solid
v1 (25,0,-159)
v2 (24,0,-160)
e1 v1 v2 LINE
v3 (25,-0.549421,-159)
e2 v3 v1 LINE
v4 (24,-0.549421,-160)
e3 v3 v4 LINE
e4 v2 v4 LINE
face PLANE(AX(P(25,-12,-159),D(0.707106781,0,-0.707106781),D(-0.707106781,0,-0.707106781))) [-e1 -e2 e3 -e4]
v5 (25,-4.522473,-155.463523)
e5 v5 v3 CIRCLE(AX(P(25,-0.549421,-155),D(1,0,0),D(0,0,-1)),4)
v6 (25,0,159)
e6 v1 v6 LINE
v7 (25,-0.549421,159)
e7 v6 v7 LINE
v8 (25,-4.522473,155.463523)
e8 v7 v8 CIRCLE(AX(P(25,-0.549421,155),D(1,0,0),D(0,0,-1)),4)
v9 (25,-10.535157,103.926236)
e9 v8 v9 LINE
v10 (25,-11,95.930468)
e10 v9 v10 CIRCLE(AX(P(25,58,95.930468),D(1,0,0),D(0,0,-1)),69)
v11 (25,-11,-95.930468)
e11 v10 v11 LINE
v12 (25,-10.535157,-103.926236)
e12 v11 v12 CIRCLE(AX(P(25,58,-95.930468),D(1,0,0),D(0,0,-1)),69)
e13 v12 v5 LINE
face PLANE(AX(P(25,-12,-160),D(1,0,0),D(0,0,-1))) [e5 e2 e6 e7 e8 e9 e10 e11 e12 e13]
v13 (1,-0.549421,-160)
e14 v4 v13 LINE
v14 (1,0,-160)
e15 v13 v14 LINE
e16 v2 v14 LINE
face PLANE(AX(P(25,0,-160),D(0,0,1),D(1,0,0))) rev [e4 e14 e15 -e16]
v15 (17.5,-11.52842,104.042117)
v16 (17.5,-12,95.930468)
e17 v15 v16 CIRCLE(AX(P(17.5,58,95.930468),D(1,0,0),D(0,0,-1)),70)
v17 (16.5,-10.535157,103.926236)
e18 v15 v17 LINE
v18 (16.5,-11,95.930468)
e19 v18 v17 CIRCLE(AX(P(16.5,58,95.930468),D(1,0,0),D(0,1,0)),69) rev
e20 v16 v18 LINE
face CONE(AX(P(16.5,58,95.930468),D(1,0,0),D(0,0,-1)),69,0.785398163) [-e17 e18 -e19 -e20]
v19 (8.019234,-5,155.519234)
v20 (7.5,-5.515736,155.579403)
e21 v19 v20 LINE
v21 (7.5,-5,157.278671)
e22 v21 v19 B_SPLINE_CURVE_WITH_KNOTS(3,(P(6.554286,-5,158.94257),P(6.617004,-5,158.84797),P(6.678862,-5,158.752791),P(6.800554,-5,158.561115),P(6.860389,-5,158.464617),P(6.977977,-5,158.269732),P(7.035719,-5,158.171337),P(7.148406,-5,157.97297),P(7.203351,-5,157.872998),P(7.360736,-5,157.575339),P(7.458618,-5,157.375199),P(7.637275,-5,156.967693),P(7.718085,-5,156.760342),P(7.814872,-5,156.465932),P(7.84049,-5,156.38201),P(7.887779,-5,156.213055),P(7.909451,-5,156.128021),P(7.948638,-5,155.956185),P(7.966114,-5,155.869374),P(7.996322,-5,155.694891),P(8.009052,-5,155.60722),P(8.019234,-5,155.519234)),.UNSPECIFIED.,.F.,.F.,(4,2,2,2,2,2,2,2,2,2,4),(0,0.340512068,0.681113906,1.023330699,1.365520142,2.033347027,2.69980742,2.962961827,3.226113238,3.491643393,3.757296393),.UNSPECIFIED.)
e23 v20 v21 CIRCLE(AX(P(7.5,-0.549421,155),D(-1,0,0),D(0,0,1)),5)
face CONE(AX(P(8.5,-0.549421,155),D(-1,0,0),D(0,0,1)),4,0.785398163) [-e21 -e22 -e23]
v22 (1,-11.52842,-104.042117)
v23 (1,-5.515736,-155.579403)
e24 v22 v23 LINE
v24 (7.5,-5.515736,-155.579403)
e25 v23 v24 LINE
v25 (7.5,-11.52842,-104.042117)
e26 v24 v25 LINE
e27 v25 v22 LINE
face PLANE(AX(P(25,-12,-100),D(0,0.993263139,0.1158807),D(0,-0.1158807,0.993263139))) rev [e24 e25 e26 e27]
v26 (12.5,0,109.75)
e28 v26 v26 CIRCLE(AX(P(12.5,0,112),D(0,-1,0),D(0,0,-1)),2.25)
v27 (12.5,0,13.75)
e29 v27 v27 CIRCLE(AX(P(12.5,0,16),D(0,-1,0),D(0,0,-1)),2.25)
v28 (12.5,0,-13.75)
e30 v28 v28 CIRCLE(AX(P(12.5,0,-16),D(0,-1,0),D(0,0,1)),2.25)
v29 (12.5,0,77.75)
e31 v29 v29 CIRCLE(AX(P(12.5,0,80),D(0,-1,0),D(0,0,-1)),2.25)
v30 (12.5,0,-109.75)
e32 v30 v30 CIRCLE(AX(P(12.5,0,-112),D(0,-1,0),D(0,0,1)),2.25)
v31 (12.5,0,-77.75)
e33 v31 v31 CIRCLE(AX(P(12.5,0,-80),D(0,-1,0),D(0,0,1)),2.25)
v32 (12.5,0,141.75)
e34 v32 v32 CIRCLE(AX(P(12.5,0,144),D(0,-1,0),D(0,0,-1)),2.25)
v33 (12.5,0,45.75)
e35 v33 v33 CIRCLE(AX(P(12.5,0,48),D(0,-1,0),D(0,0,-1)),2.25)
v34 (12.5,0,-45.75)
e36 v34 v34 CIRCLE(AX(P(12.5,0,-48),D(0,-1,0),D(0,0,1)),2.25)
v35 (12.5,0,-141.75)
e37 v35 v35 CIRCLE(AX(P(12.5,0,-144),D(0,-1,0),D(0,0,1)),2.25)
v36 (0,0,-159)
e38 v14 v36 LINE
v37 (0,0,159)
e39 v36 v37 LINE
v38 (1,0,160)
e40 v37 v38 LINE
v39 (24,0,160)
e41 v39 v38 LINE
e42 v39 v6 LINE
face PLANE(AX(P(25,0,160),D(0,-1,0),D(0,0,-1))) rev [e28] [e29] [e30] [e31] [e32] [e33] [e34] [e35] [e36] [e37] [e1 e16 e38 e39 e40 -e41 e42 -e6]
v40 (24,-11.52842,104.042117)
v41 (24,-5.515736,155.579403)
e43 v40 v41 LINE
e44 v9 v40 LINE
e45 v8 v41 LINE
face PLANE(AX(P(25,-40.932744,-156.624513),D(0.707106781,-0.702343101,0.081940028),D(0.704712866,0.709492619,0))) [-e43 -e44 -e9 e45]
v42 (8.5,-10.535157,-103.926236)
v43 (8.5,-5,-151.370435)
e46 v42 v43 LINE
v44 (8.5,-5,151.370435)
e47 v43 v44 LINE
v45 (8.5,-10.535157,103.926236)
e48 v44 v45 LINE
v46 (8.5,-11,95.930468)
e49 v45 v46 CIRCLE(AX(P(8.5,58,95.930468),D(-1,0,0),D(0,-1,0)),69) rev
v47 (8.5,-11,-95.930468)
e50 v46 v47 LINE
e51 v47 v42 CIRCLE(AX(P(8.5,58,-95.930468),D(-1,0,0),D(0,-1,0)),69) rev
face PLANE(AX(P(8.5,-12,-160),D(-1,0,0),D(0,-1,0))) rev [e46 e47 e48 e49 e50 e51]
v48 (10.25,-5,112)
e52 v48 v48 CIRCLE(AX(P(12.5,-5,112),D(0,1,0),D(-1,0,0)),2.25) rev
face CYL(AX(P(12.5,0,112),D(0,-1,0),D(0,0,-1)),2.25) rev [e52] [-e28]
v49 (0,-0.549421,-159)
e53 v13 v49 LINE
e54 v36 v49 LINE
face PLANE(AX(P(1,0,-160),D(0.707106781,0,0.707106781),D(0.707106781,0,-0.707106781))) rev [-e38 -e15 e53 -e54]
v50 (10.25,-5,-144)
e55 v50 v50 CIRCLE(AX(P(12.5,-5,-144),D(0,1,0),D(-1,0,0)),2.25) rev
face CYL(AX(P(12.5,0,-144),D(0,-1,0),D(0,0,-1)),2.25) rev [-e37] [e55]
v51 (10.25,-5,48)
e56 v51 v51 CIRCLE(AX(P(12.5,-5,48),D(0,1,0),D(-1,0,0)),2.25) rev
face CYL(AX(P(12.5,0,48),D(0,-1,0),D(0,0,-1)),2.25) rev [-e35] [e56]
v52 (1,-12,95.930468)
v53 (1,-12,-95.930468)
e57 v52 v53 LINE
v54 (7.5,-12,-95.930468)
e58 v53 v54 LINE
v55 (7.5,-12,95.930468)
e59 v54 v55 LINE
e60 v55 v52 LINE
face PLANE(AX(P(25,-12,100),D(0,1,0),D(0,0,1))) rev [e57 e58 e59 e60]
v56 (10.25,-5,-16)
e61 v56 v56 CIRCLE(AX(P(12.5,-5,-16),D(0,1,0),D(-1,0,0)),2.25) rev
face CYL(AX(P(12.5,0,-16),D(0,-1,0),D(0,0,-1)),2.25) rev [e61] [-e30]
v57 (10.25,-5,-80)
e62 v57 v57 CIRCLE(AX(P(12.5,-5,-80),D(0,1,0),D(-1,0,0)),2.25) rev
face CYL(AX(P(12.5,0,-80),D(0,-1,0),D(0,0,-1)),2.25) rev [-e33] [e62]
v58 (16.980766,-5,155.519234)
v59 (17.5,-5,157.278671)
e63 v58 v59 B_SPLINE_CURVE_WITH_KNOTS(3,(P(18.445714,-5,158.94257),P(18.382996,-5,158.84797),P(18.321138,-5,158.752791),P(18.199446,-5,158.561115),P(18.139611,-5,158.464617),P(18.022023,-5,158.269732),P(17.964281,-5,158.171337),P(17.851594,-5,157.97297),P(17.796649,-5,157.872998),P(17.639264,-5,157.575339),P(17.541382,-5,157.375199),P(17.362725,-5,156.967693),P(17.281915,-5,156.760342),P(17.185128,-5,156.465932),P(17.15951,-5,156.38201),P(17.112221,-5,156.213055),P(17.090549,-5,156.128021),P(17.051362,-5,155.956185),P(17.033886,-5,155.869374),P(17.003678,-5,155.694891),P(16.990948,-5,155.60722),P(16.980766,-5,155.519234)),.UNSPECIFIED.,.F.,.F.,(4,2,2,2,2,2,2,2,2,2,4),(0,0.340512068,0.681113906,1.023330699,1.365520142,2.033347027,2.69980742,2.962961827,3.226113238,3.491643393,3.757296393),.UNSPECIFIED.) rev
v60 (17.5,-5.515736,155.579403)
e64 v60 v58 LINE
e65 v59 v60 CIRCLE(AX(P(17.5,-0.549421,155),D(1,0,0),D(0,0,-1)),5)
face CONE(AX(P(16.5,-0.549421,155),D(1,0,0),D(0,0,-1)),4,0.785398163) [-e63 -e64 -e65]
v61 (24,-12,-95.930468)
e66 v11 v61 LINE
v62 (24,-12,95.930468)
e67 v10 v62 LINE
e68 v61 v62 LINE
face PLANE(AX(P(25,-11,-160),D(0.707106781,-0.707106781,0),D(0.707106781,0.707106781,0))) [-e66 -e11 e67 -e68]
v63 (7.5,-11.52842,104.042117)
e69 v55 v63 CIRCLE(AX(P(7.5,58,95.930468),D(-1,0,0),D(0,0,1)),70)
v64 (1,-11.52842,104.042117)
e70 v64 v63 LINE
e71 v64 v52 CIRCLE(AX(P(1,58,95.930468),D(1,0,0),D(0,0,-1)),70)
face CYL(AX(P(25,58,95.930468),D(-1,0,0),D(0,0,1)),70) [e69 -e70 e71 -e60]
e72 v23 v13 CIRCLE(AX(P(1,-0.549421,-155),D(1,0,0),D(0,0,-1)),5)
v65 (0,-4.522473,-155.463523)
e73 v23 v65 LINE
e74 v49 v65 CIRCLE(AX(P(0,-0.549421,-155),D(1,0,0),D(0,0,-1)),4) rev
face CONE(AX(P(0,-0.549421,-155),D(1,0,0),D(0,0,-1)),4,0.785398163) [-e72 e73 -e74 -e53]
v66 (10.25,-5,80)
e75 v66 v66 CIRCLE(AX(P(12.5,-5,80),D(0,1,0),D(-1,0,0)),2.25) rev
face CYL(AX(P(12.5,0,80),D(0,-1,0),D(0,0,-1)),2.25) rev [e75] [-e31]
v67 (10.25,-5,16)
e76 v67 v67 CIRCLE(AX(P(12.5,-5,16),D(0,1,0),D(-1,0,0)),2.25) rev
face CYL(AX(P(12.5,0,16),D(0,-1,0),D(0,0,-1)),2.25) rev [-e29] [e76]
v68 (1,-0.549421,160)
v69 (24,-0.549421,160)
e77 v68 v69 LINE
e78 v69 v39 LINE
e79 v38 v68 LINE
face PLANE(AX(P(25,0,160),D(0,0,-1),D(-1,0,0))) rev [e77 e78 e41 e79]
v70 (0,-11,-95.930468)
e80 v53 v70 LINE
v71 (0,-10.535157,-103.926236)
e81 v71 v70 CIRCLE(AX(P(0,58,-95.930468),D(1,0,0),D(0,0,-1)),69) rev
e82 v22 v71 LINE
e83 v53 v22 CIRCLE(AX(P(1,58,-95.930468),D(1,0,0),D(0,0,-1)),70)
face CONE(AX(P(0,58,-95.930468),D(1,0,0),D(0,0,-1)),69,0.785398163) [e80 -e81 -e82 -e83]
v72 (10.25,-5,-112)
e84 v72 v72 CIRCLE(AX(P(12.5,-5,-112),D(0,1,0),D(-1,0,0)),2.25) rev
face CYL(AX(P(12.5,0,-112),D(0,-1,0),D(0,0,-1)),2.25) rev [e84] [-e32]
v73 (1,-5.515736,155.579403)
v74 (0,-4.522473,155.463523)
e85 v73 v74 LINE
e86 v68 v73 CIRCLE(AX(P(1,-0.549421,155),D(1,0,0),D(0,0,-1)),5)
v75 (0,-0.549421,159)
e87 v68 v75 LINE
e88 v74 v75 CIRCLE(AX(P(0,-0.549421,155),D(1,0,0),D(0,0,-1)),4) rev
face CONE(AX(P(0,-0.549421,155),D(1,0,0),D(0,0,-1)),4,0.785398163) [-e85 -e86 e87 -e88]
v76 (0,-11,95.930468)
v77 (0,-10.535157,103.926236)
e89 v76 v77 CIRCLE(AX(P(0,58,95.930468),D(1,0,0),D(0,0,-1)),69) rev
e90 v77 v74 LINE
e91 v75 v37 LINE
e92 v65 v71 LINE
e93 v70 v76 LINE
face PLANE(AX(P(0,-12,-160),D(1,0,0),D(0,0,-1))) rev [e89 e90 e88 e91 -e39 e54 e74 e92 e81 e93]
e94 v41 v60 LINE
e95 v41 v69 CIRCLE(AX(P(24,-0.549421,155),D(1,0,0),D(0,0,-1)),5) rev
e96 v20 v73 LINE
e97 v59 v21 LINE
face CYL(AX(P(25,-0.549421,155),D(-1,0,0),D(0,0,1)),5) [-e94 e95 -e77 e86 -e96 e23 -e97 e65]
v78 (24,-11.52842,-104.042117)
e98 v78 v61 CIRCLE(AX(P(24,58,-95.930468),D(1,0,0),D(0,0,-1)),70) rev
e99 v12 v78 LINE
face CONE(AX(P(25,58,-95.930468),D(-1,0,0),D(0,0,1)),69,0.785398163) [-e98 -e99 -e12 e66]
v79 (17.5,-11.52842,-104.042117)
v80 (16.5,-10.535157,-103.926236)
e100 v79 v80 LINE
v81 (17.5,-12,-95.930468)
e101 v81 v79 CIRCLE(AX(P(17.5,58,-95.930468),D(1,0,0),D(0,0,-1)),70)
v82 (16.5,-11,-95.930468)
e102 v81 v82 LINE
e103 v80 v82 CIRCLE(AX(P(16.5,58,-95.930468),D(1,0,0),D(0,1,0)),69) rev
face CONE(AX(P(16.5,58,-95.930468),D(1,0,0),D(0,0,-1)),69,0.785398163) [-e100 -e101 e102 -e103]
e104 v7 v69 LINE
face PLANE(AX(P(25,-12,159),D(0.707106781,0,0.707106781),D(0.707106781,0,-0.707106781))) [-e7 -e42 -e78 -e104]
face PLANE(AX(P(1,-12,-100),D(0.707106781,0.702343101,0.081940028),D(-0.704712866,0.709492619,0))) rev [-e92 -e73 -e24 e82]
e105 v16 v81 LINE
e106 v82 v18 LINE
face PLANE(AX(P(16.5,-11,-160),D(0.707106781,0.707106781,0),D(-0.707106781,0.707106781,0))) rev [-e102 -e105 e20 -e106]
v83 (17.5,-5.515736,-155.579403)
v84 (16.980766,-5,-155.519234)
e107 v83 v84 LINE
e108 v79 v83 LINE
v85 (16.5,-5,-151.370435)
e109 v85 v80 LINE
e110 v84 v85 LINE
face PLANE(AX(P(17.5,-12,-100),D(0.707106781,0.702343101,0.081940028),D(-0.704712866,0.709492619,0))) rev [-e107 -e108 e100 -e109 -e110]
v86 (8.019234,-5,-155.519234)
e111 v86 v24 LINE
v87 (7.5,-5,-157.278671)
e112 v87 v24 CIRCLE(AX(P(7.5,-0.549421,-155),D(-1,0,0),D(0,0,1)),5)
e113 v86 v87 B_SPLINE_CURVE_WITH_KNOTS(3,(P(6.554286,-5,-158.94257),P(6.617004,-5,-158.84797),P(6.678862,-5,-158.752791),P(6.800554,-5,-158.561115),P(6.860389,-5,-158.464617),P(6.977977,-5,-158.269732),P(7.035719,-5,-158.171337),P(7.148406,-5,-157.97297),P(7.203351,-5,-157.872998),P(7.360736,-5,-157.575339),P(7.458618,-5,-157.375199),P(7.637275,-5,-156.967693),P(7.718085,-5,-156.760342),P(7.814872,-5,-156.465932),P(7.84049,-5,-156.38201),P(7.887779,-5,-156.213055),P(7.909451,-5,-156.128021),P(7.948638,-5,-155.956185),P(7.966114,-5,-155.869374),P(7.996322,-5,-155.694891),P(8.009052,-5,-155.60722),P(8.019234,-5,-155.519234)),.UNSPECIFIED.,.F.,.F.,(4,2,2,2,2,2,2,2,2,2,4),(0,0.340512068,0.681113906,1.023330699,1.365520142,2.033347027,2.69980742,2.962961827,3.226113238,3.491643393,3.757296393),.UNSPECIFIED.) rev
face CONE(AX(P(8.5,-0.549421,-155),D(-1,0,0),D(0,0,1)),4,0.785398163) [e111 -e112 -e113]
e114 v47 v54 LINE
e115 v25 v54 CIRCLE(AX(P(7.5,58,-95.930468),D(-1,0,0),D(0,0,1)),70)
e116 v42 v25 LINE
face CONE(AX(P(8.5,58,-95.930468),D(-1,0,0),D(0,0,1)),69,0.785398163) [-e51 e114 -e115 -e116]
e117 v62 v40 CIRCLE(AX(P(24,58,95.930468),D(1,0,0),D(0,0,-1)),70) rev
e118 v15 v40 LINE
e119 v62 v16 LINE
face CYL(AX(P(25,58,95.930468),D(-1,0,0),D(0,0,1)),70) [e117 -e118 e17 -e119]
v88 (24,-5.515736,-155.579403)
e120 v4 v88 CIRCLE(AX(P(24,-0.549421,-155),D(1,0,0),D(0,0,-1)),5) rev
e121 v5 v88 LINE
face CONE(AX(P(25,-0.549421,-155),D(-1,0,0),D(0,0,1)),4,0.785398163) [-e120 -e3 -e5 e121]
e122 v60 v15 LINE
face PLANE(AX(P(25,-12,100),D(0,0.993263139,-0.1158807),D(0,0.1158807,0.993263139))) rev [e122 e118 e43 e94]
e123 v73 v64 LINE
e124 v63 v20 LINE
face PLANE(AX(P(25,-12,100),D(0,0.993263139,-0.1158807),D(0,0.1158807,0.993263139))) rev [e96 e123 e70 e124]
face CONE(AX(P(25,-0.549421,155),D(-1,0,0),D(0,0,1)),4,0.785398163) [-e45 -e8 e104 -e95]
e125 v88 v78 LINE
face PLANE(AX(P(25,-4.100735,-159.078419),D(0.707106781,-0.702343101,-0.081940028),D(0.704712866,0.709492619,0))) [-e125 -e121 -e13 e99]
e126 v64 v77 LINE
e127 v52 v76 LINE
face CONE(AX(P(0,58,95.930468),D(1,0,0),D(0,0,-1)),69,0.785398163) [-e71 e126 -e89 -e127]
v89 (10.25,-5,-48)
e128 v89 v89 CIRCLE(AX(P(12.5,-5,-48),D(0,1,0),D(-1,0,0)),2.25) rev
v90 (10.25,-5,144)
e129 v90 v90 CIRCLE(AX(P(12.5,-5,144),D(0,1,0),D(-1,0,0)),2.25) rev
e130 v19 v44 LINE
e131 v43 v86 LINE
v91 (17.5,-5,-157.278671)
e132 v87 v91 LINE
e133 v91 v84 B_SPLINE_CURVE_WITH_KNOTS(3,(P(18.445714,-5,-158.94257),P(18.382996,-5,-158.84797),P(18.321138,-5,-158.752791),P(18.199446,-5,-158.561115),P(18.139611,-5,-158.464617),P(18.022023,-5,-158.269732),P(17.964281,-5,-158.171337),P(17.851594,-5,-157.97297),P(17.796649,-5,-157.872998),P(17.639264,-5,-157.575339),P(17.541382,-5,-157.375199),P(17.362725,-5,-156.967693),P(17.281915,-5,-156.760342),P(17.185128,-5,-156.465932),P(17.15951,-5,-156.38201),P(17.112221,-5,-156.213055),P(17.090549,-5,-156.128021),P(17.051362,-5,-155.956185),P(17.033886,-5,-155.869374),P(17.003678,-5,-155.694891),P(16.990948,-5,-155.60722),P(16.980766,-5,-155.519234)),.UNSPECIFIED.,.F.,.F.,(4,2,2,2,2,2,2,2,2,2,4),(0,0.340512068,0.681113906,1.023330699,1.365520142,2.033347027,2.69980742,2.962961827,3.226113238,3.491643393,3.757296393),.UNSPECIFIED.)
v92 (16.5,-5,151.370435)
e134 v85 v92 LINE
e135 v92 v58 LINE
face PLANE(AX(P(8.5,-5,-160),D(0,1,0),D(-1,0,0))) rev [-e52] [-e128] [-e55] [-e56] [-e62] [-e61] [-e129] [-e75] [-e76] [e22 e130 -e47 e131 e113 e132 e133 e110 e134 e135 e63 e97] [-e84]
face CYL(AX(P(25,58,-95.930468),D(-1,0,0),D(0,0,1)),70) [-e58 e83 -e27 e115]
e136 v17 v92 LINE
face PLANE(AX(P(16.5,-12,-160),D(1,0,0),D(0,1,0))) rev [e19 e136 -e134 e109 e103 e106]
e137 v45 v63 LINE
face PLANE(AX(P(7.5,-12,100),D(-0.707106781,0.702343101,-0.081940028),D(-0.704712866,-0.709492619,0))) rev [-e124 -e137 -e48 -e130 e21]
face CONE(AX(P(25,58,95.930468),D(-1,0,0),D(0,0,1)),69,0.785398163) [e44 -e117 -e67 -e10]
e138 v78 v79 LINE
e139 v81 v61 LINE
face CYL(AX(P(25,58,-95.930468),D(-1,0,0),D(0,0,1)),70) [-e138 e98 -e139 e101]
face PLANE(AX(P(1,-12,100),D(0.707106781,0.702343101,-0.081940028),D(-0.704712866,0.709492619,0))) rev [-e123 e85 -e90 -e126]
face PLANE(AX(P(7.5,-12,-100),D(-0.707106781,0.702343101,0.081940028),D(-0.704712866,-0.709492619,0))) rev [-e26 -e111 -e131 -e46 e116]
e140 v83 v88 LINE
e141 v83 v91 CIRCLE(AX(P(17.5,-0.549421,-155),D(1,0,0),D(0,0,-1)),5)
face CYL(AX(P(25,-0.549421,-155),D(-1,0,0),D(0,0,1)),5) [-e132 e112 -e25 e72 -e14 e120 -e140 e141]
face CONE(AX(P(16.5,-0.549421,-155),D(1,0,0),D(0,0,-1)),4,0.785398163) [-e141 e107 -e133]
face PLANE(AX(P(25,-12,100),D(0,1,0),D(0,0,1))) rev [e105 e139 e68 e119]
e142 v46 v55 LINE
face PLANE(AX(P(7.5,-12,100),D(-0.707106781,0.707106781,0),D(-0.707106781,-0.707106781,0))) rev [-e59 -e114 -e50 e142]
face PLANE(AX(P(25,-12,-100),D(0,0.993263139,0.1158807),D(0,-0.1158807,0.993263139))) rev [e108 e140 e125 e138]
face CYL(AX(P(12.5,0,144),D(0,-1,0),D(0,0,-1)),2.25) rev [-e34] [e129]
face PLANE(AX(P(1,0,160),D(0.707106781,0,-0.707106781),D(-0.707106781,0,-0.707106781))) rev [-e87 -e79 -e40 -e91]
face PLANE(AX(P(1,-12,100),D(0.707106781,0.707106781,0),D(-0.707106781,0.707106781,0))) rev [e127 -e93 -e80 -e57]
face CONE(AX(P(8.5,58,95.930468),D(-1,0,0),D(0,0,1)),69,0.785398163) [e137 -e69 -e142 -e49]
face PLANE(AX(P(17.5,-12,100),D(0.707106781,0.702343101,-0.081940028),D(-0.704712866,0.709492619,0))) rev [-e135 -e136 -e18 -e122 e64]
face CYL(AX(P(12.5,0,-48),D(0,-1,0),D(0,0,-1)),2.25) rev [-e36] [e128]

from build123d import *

# Parameters (mm, degrees)
BOSS_EXTRUDE1_DEPTH = 25
FILLET1_R           = 70
FILLET2_R           = 5
CHAMFER1_SIZE       = 1
SKETCH2_R           = 2.25
CUT_EXTRUDE1_DEPTH  = 163.385344166
SKETCH5_W           = 8
SKETCH5_H           = 7
CUT_EXTRUDE2_DEPTH  = 322.199315068
CHAMFER2_SIZE       = 1


with BuildPart() as part:
    # Sketch1 → Boss-Extrude1 (new body)
    with BuildSketch(Plane(origin=(0, 0, 0), x_dir=(0, 0, -1), z_dir=(1, 0, 0))):
        Polygon((-160, 0), (160, 0), (160, -5), (100, -12), (-100, -12), (-160, -5), align=None)
    extrude(amount=BOSS_EXTRUDE1_DEPTH)

    # Fillet1
    fillet1_edges = [part.edges().sort_by_distance(p)[0] for p in [
        (12.5, -12, -100),
        (12.5, -12, 100),
    ]]
    fillet(fillet1_edges, radius=FILLET1_R)

    # Fillet2
    fillet2_edges = [part.edges().sort_by_distance(p)[0] for p in [
        (12.5, -5, -160),
        (12.5, -5, 160),
    ]]
    fillet(fillet2_edges, radius=FILLET2_R)

    # Chamfer1
    chamfer1_edges = [part.edges().sort_by_distance(p)[0] for p in [
        (25, -0.274710282, 160),
        (0, -8.522077997, -129.810760023),
        (25, -8.522077997, -129.810760023),
        (0, -12, 0),
        (0, -11.882005486, 99.99314025),
        (0, -11.882005486, -99.99314025),
        (25, -12, 0),
        (25, -11.882005486, 99.99314025),
        (25, -11.882005486, -99.99314025),
        (0, -0.274710282, -160),
        (25, -0.274710282, -160),
        (0, -8.522077997, 129.810760023),
        (0, -3.873798889, 158.73477024),
        (0, -3.873798889, -158.73477024),
        (25, -8.522077997, 129.810760023),
        (25, -3.873798889, 158.73477024),
        (25, -3.873798889, -158.73477024),
        (0, -0.274710282, 160),
    ]]
    chamfer(chamfer1_edges, length=CHAMFER1_SIZE)

    # Sketch2 → Cut-Extrude1 (cut, through all)
    with BuildSketch(Plane.XZ.offset(12)):
        with Locations(Location((12.5, 144, 0), (0, 0, 270))):
            Circle(SKETCH2_R)
        with Locations(Location((12.5, 112, 0), (0, 0, 270))):
            Circle(SKETCH2_R)
        with Locations(Location((12.5, 48, 0), (0, 0, 270))):
            Circle(SKETCH2_R)
        with Locations(Location((12.5, 80, 0), (0, 0, 270))):
            Circle(SKETCH2_R)
        with Locations(Location((12.5, -80, 0), (0, 0, 90))):
            Circle(SKETCH2_R)
        with Locations(Location((12.5, -48, 0), (0, 0, 90))):
            Circle(SKETCH2_R)
        with Locations(Location((12.5, -112, 0), (0, 0, 90))):
            Circle(SKETCH2_R)
        with Locations(Location((12.5, -144, 0), (0, 0, 90))):
            Circle(SKETCH2_R)
        with Locations(Location((12.5, 16, 0), (0, 0, 270))):
            Circle(SKETCH2_R)
        with Locations(Location((12.5, -16, 0), (0, 0, 90))):
            Circle(SKETCH2_R)
    extrude(amount=-CUT_EXTRUDE1_DEPTH, mode=Mode.SUBTRACT)

    # Sketch5 → Cut-Extrude2 (cut, through all)
    with BuildSketch(Plane.XY.offset(160)):
        with Locations((12.5, -8.5)):
            Rectangle(SKETCH5_W, SKETCH5_H)
    extrude(amount=-CUT_EXTRUDE2_DEPTH, mode=Mode.SUBTRACT)

    # Chamfer2
    # the kernel refuses this chamfer: 1 mm, written as the material it takes off along each edge
    with BuildSketch(Plane(origin=(16.5, -0.549420563, 155), x_dir=(0, -0.5507413136369002, 0.8346759883053434), z_dir=(0, 0.8346759883053434, 0.5507413136369002))) as chamfer2_piece_1_section:
        Polygon((5, CHAMFER2_SIZE), (5 - CHAMFER2_SIZE, 0), (5, 0), align=None)
    chamfer2_piece_1 = revolve(axis=Axis((16.5, -0.549420563, 155), (1, 0, 0)), revolution_arc=49.927689897, mode=Mode.PRIVATE)
    chamfer2_piece_1 = split(chamfer2_piece_1, bisect_by=Plane(origin=(16.914516826, -5, 156.211106637), z_dir=(0, -1, 0)), keep=Keep.TOP, mode=Mode.PRIVATE)
    add(chamfer2_piece_1, mode=Mode.SUBTRACT)
    with BuildSketch(Plane(origin=(8.5, -0.549420563, 155), x_dir=(0, -0.5507413136369004, 0.8346759883053431), z_dir=(0, 0.8346759883053431, 0.5507413136369004))) as chamfer2_piece_2_section:
        Polygon((5 - CHAMFER2_SIZE, 0), (5, -CHAMFER2_SIZE), (5, 0), align=None)
    chamfer2_piece_2 = revolve(axis=Axis((8.5, -0.549420563, 155), (1, 0, 0)), revolution_arc=49.927689897, mode=Mode.PRIVATE)
    chamfer2_piece_2 = split(chamfer2_piece_2, bisect_by=Plane(origin=(8.085483174, -5, 156.211106637), z_dir=(0, -1, 0)), keep=Keep.TOP, mode=Mode.PRIVATE)
    add(chamfer2_piece_2, mode=Mode.SUBTRACT)
    with BuildSketch(Plane(origin=(8.5, 58, -95.930467578), x_dir=(0, -1, 0), z_dir=(0, 0, 1))) as chamfer2_piece_3:
        Polygon((70, -CHAMFER2_SIZE), (70 - CHAMFER2_SIZE, 0), (70, 0), align=None)
    revolve(axis=Axis((8.5, 58, -95.930467578), (1, 0, 0)), revolution_arc=6.654425046, mode=Mode.SUBTRACT)
    with BuildSketch(Plane(origin=(8.5, -0.549420563, -155), x_dir=(0, -0.9932631390872432, -0.11588069956017648), z_dir=(0, -0.11588069956017648, 0.9932631390872432))) as chamfer2_piece_4_section:
        Polygon((5 - CHAMFER2_SIZE, 0), (5, -CHAMFER2_SIZE), (5, 0), align=None)
    chamfer2_piece_4 = revolve(axis=Axis((8.5, -0.549420563, -155), (1, 0, 0)), revolution_arc=49.927689897, mode=Mode.PRIVATE)
    chamfer2_piece_4 = split(chamfer2_piece_4, bisect_by=Plane(origin=(8.085483174, -5, -156.211106637), z_dir=(0, -1, 0)), keep=Keep.TOP, mode=Mode.PRIVATE)
    add(chamfer2_piece_4, mode=Mode.SUBTRACT)
    with BuildSketch(Plane(origin=(8.5, 58, 95.930467578), x_dir=(0, -0.9932631390872428, 0.11588069956017871), z_dir=(0, 0.11588069956017871, 0.9932631390872428))) as chamfer2_piece_5:
        Polygon((70 - CHAMFER2_SIZE, 0), (70, -CHAMFER2_SIZE), (70, 0), align=None)
    revolve(axis=Axis((8.5, 58, 95.930467578), (1, 0, 0)), revolution_arc=6.654425046, mode=Mode.SUBTRACT)
    with BuildSketch(Plane(origin=(16.5, 58, -95.930467578), x_dir=(0, -1, 0), z_dir=(0, 0, 1))) as chamfer2_piece_6:
        Polygon((70 - CHAMFER2_SIZE, 0), (70, CHAMFER2_SIZE), (70, 0), align=None)
    revolve(axis=Axis((16.5, 58, -95.930467578), (1, 0, 0)), revolution_arc=6.654425046, mode=Mode.SUBTRACT)
    with BuildSketch(Plane(origin=(16.5, -0.549420563, -155), x_dir=(0, -0.9932631390872432, -0.11588069956017648), z_dir=(0, -0.11588069956017648, 0.9932631390872432))) as chamfer2_piece_7_section:
        Polygon((5, CHAMFER2_SIZE), (5 - CHAMFER2_SIZE, 0), (5, 0), align=None)
    chamfer2_piece_7 = revolve(axis=Axis((16.5, -0.549420563, -155), (1, 0, 0)), revolution_arc=49.927689897, mode=Mode.PRIVATE)
    chamfer2_piece_7 = split(chamfer2_piece_7, bisect_by=Plane(origin=(16.914516826, -5, -156.211106637), z_dir=(0, -1, 0)), keep=Keep.TOP, mode=Mode.PRIVATE)
    add(chamfer2_piece_7, mode=Mode.SUBTRACT)
    with BuildSketch(Plane(origin=(16.5, 58, 95.930467578), x_dir=(0, -0.9932631390872428, 0.11588069956017871), z_dir=(0, 0.11588069956017871, 0.9932631390872428))) as chamfer2_piece_8:
        Polygon((70 - CHAMFER2_SIZE, 0), (70, CHAMFER2_SIZE), (70, 0), align=None)
    revolve(axis=Axis((16.5, 58, 95.930467578), (1, 0, 0)), revolution_arc=6.654425046, mode=Mode.SUBTRACT)
    with BuildSketch(Plane(origin=(16.5, -12, 95.930467578), x_dir=(-0.0274958766105891, 0.9996219169112968, 0), z_dir=(0, 0, -1))) as chamfer2_piece_9:
        Polygon((CHAMFER2_SIZE * 0.999621916911, CHAMFER2_SIZE * 0.0274958766106), (-CHAMFER2_SIZE * 0.0274958766106, CHAMFER2_SIZE * 0.999621916911), (0, 0), align=None)
    extrude(amount=191.860935157, mode=Mode.SUBTRACT)
    with BuildSketch(Plane(origin=(8.5, -12, 95.930467578), x_dir=(0.02749587661058392, 0.9996219169112968, 0), z_dir=(0, 0, -1))) as chamfer2_piece_10:
        Polygon((CHAMFER2_SIZE * 0.999621916911, -CHAMFER2_SIZE * 0.0274958766106), (-CHAMFER2_SIZE * 0.0274958766106, -CHAMFER2_SIZE * 0.999621916911), (0, 0), align=None)
    extrude(amount=191.860935157, mode=Mode.SUBTRACT)
    with BuildSketch(Plane(origin=(8.5, -5.515736259, 155.579403498), x_dir=(0.02749587661058567, 0.9928876030917217, -0.11583688702736752), z_dir=(0, -0.11588069956017834, -0.993263139087243))) as chamfer2_piece_11_section:
        Polygon((CHAMFER2_SIZE * 0.999621916911, -CHAMFER2_SIZE * 0.0274958766106), (-CHAMFER2_SIZE * 0.0274958766106, -CHAMFER2_SIZE * 0.999621916911), (0, 0), align=None)
    chamfer2_piece_11 = extrude(amount=51.886841384, mode=Mode.PRIVATE)
    chamfer2_piece_11 = split(chamfer2_piece_11, bisect_by=Plane(origin=(8.17503416, -5, 154.587318638), z_dir=(0, -1, 0)), keep=Keep.TOP, mode=Mode.PRIVATE)
    add(chamfer2_piece_11, mode=Mode.SUBTRACT)
    with BuildSketch(Plane(origin=(8.5, -11.528419736, -104.042116548), x_dir=(-0.9996219169112968, -0.027310640714189302, -0.0031862414166552175), z_dir=(0, 0.11588069956017857, -0.993263139087243))) as chamfer2_piece_12_section:
        Polygon((CHAMFER2_SIZE * 0.999621916911, CHAMFER2_SIZE * 0.0274958766106), (-CHAMFER2_SIZE * 0.0274958766106, CHAMFER2_SIZE * 0.999621916911), (0, 0), align=None)
    chamfer2_piece_12 = extrude(amount=51.886841384, mode=Mode.PRIVATE)
    chamfer2_piece_12 = split(chamfer2_piece_12, bisect_by=Plane(origin=(8.158054196, -5, -132.007867246), z_dir=(0, -1, 0)), keep=Keep.TOP, mode=Mode.PRIVATE)
    add(chamfer2_piece_12, mode=Mode.SUBTRACT)
    with BuildSketch(Plane(origin=(16.5, -5.515736259, -155.579403498), x_dir=(-0.027495876610589238, 0.9928876030917216, 0.11583688702736777), z_dir=(0, -0.11588069956017857, 0.993263139087243))) as chamfer2_piece_13_section:
        Polygon((CHAMFER2_SIZE * 0.999621916911, -CHAMFER2_SIZE * 0.0274958766106), (-CHAMFER2_SIZE * 0.0274958766106, -CHAMFER2_SIZE * 0.999621916911), (0, 0), align=None)
    chamfer2_piece_13 = extrude(amount=51.886841384, mode=Mode.PRIVATE)
    chamfer2_piece_13 = split(chamfer2_piece_13, bisect_by=Plane(origin=(16.82496584, -5, -154.587318638), z_dir=(0, -1, 0)), keep=Keep.TOP, mode=Mode.PRIVATE)
    add(chamfer2_piece_13, mode=Mode.SUBTRACT)
    with BuildSketch(Plane(origin=(16.5, -11.528419736, 104.042116548), x_dir=(-0.02749587661058908, 0.9928876030917217, -0.11583688702736755), z_dir=(0, 0.11588069956017834, 0.993263139087243))) as chamfer2_piece_14_section:
        Polygon((CHAMFER2_SIZE * 0.999621916911, -CHAMFER2_SIZE * 0.0274958766106), (-CHAMFER2_SIZE * 0.0274958766106, -CHAMFER2_SIZE * 0.999621916911), (0, 0), align=None)
    chamfer2_piece_14 = extrude(amount=51.886841384, mode=Mode.PRIVATE)
    chamfer2_piece_14 = split(chamfer2_piece_14, bisect_by=Plane(origin=(16.785811772, -5, 107.657614918), z_dir=(0, -1, 0)), keep=Keep.TOP, mode=Mode.PRIVATE)
    add(chamfer2_piece_14, mode=Mode.SUBTRACT)


solid = part.part
